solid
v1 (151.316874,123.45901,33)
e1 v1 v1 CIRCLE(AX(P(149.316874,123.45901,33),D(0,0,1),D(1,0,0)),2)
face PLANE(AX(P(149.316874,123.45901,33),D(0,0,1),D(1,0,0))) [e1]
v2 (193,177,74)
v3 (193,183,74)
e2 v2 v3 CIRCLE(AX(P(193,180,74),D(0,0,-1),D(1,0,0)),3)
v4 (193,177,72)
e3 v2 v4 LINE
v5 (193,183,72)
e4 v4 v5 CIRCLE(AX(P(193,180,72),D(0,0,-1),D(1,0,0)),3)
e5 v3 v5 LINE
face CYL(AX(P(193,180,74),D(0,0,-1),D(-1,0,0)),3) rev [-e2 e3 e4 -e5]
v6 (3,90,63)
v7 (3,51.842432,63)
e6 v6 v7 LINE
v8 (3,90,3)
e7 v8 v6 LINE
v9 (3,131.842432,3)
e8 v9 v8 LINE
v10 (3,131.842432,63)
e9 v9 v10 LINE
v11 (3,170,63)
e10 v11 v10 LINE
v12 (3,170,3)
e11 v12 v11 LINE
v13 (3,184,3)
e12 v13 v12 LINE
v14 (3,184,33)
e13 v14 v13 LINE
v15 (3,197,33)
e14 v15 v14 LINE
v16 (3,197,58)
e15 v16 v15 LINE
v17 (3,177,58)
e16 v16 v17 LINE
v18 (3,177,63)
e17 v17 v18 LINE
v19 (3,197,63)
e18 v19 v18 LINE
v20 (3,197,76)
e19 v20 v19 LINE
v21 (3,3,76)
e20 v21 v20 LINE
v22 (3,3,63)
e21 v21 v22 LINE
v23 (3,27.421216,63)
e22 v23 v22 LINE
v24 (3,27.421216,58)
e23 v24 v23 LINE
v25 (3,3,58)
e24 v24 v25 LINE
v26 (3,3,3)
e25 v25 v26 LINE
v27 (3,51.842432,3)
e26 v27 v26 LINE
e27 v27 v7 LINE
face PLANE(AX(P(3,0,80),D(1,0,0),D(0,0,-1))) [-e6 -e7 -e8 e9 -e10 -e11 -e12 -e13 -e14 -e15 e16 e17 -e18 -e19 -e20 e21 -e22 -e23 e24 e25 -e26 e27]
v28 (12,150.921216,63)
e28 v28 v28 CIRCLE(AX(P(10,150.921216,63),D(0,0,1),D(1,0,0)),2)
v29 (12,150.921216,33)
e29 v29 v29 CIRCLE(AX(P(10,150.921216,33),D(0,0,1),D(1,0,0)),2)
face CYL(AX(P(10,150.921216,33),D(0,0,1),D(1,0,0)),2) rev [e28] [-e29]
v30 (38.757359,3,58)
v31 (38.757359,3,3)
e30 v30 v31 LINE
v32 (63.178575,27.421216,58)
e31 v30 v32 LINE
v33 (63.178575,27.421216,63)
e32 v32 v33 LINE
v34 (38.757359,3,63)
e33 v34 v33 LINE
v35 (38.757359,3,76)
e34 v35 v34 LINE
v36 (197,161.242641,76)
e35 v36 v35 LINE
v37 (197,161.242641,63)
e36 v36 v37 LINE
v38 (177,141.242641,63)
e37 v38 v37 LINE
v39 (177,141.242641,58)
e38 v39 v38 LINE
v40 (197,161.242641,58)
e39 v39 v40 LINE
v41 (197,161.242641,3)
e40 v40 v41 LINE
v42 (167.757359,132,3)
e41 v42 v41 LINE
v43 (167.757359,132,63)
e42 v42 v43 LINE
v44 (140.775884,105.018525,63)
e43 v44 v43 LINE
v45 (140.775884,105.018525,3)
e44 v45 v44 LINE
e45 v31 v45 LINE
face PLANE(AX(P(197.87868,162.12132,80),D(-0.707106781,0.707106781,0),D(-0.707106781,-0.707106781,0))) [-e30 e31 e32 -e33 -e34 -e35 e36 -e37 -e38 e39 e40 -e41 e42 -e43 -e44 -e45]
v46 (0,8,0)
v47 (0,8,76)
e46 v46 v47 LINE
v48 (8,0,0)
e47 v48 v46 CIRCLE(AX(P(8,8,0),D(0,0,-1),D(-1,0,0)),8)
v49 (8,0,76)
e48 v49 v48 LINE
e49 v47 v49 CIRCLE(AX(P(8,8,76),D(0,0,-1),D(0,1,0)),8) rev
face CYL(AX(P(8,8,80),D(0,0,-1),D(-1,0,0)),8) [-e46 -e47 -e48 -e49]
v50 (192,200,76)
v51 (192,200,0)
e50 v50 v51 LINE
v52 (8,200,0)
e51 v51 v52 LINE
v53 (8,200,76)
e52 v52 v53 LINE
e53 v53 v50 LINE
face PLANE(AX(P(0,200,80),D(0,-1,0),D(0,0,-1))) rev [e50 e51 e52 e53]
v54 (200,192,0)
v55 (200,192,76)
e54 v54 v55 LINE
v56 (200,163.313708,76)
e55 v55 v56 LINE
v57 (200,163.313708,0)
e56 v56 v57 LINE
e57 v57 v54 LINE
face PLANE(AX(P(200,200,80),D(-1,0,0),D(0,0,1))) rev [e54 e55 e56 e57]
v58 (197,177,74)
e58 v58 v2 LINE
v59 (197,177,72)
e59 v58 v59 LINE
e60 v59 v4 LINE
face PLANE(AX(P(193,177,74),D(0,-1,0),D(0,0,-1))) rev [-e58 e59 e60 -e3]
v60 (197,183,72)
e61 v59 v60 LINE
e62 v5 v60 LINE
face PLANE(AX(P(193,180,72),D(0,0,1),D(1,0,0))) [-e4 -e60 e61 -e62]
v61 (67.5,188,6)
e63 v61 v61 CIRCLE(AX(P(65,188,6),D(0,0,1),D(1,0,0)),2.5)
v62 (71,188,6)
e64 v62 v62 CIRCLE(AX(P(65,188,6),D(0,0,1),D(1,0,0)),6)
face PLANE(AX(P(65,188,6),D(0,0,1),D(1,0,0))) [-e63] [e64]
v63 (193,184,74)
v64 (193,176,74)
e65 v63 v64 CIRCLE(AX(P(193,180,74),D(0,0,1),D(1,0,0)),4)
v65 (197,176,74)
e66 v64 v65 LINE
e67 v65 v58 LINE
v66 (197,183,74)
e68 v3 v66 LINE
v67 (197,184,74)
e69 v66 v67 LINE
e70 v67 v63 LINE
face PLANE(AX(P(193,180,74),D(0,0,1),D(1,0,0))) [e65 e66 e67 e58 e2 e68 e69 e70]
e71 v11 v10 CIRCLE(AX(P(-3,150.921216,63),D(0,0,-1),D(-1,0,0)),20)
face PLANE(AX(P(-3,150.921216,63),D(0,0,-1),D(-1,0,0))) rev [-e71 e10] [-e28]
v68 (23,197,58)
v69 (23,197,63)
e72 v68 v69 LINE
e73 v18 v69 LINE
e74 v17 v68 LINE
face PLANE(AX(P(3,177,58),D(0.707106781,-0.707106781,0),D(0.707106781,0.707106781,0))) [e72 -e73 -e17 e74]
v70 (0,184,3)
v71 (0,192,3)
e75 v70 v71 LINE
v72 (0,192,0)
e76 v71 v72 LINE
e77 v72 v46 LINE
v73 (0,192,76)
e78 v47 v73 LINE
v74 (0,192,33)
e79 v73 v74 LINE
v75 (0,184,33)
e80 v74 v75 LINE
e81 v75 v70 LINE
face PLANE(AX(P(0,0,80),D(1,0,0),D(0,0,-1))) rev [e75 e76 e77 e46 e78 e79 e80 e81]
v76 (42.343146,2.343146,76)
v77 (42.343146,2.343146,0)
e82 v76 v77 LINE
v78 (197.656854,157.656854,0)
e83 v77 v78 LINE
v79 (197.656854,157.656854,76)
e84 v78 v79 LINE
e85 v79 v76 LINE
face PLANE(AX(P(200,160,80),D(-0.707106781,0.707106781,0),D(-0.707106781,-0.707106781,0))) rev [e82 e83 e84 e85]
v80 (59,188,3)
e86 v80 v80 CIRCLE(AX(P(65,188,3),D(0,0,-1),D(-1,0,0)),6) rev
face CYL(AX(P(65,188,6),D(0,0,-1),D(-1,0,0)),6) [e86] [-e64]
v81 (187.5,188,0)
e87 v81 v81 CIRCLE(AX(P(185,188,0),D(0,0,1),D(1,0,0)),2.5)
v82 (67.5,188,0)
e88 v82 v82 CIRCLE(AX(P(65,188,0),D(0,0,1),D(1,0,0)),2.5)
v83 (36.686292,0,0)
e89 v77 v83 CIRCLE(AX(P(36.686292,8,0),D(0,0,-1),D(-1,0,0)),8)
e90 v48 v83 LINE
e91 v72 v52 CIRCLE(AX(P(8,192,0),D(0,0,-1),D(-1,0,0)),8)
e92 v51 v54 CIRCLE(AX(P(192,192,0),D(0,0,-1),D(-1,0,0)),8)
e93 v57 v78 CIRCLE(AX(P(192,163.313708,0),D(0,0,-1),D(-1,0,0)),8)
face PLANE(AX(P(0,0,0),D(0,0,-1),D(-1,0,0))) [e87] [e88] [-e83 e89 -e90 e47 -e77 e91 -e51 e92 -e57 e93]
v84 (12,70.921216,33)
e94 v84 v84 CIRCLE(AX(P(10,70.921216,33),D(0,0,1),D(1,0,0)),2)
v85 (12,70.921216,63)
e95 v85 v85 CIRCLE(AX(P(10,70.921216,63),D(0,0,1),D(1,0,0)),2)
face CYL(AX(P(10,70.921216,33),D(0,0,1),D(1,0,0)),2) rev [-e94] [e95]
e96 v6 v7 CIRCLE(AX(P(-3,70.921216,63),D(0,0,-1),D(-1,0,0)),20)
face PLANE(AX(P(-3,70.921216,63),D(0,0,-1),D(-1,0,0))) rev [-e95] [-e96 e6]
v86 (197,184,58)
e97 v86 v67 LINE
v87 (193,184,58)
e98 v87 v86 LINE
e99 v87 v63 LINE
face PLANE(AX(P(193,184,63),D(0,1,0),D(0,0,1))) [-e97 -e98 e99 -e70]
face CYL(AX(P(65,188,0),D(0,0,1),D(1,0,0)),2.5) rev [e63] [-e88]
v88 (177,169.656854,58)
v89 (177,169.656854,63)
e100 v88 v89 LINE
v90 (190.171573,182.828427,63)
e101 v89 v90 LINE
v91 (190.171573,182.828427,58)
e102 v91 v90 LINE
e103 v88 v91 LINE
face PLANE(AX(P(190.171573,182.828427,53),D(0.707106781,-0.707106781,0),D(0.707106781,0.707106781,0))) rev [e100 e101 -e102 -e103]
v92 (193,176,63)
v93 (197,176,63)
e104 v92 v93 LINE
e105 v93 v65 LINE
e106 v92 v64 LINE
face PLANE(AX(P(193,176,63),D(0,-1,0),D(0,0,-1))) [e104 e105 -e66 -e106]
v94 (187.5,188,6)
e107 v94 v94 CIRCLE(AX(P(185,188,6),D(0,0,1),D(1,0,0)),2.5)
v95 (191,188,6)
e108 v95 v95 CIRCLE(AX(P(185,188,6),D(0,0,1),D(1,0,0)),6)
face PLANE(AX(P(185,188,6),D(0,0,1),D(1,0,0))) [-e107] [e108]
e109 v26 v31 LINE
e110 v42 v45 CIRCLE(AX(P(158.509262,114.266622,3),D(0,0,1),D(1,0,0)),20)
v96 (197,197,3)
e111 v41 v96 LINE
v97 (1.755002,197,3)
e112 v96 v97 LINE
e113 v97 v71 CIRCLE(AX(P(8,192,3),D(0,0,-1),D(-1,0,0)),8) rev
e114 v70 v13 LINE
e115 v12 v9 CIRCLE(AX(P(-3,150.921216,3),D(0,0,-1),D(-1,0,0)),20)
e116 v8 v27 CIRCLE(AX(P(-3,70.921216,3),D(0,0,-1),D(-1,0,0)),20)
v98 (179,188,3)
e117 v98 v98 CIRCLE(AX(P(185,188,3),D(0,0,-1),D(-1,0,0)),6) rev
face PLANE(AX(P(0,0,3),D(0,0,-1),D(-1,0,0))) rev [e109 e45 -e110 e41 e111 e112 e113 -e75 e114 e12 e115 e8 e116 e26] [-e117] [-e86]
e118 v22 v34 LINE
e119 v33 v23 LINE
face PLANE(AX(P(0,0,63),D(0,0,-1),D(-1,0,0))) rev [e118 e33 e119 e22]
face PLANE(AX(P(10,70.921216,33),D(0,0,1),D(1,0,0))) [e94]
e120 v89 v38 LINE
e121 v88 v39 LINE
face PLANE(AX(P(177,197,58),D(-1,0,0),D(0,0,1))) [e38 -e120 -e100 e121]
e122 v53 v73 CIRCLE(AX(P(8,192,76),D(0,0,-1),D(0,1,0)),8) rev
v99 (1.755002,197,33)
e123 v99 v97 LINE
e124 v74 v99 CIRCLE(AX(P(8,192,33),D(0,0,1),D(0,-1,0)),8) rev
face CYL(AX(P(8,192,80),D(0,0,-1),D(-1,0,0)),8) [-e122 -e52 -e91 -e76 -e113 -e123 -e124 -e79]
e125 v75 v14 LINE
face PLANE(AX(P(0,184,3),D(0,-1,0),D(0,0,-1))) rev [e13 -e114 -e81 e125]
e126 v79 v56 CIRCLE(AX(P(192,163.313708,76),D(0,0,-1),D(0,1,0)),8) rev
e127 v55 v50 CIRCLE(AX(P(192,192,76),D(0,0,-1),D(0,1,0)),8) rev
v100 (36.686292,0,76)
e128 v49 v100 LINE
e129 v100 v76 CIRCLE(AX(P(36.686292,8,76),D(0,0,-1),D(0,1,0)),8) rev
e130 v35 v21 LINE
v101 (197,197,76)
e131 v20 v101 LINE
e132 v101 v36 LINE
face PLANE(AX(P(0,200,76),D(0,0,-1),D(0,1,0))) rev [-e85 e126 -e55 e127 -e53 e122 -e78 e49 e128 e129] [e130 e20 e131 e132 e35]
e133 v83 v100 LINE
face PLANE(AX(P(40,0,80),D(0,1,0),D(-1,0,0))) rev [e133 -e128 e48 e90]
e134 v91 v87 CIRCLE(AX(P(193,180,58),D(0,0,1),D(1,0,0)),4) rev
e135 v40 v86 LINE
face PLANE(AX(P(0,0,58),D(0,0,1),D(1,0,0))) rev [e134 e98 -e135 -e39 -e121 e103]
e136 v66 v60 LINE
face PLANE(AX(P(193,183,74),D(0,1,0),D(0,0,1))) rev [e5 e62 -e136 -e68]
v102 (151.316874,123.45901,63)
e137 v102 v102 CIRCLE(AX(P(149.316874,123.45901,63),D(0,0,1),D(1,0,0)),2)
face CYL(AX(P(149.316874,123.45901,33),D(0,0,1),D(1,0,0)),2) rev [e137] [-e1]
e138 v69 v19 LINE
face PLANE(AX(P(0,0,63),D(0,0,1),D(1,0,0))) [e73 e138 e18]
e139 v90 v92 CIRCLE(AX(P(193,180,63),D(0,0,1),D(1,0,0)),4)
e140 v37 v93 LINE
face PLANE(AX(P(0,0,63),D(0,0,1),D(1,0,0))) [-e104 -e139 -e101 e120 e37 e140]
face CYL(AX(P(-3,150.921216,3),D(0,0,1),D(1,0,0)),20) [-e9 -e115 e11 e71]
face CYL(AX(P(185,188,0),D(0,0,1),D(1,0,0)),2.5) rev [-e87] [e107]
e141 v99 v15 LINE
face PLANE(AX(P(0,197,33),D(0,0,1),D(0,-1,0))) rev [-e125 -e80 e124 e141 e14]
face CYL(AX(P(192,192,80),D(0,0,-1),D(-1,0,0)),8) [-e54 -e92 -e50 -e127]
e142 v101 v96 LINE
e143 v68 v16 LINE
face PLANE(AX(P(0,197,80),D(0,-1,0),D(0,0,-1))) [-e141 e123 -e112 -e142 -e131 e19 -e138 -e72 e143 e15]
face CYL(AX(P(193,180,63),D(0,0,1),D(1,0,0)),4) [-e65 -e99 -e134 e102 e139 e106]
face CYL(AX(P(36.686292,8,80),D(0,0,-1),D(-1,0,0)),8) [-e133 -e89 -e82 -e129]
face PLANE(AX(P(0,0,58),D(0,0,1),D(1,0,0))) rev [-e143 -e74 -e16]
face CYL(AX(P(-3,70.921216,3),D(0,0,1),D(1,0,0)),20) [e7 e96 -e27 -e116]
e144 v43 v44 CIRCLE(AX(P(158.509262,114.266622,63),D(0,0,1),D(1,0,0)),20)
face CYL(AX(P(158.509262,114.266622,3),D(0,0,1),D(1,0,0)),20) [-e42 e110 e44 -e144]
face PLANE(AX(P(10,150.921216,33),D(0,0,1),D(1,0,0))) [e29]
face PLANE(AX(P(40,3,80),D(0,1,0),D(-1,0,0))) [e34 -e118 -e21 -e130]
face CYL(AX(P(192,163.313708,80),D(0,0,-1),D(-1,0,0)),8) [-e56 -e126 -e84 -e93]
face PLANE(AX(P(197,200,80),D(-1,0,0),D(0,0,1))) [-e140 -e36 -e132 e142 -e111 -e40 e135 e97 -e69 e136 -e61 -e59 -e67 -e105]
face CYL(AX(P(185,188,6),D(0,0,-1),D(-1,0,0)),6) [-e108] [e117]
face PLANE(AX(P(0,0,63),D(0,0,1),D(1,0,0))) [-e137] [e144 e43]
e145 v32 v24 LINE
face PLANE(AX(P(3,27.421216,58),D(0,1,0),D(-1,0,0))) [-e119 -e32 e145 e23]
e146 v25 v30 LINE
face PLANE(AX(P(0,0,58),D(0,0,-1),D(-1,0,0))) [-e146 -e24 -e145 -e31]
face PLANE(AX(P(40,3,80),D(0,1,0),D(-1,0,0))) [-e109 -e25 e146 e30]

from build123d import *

# Parameters (mm, degrees)
ESTRUSIONE_ESTRUSIONE1_DEPTH  = 80
SVUOTA1_T                     = -3
TAGLIO_ESTRUSIONE1_DEPTH      = 294.938769134
TAGLIO_ESTRUSIONE1_DEPTH_BACK = 294.938769134
SCHIZZO5_W                    = 4
SCHIZZO5_H                    = 200
ESTRUSIONE_ESTRUSIONE4_DEPTH  = 60
SCHIZZO8_R                    = 2
TAGLIO_ESTRUSIONE2_DEPTH      = 30
ESTRUSIONE_ESTRUSIONE7_DEPTH  = 5
ESTRUSIONE_ESTRUSIONE8_DEPTH  = 9
ESTRUSIONE_ESTRUSIONE9_START  = 2
ESTRUSIONE_ESTRUSIONE9_DEPTH  = 2
TAGLIO_ESTRUSIONE3_START      = -3
TAGLIO_ESTRUSIONE3_OUTLINE_W  = 30
TAGLIO_ESTRUSIONE3_OUTLINE_H  = 13
TAGLIO_ESTRUSIONE3_DEPTH      = 3
TAGLIO_ESTRUSIONE5_DEPTH      = 10
SCHIZZO18_R                   = 6
ESTRUSIONE_ESTRUSIONE11_DEPTH = 3
TAGLIO_ESTRUSIONE6_DEPTH      = 292.376045687
TAGLIO_ESTRUSIONE6_DEPTH_BACK = 292.376045687
SCHIZZO19_R                   = 2.5
RACCORDO1_R                   = 8


# Read off the part's stored shape, not the designer's step: Taglio-Estrusione3
with BuildPart() as part:
    # Schizzo2 → Estrusione-Estrusione1 (new body)
    with BuildSketch(Plane.XY):
        Polygon((0, 0), (0, 200), (200, 200), (200, 160), (40, 0), align=None)
    extrude(amount=ESTRUSIONE_ESTRUSIONE1_DEPTH)

    # Svuota1
    svuota1_openings = [part.faces().sort_by_distance(p)[0] for p in [
        (78.039215686, 121.960784314, 80),
    ]]
    offset(amount=SVUOTA1_T, openings=svuota1_openings, kind=Kind.INTERSECTION)

    # Schizzo5 → Taglio-Estrusione1 (cut, two sides: drawn at the far end of the back side and taken through both)
    with BuildSketch(Plane(origin=(200, 0, 0), x_dir=(0, 0, -1), z_dir=(1, 0, 0)).offset(-TAGLIO_ESTRUSIONE1_DEPTH_BACK)):
        with Locations((-78, 100)):
            Rectangle(SCHIZZO5_W, SCHIZZO5_H)
    extrude(amount=TAGLIO_ESTRUSIONE1_DEPTH + TAGLIO_ESTRUSIONE1_DEPTH_BACK, mode=Mode.SUBTRACT)

    # Schizzo7 → Estrusione-Estrusione4 (add)
    with BuildSketch(Plane.XY.offset(63)):
        with BuildLine():
            Line((140.775884186, 105.018524874), (167.757359313, 132))
            ThreePointArc((167.757359313, 132), (144.367126813, 128.408757373), (140.775884186, 105.018524874))
        make_face()
        with BuildLine():
            ThreePointArc((3, 170), (17, 150.921215972), (3, 131.842431943))
            Line((3, 131.842431943), (3, 170))
        make_face()
        with BuildLine():
            ThreePointArc((3, 90), (17, 70.921215972), (3, 51.842431943))
            Line((3, 51.842431943), (3, 90))
        make_face()
    extrude(amount=-ESTRUSIONE_ESTRUSIONE4_DEPTH)

    # Schizzo8 → Taglio-Estrusione2 (cut)
    with BuildSketch(Plane.XY.offset(63)):
        with Locations((10, 150.921215972)):
            Circle(SCHIZZO8_R)
        with Locations((10, 70.921215972)):
            Circle(SCHIZZO8_R)
        with Locations((149.316874281, 123.459009905)):
            Circle(SCHIZZO8_R)
    extrude(amount=-TAGLIO_ESTRUSIONE2_DEPTH, mode=Mode.SUBTRACT)

    # Schizzo11 → Estrusione-Estrusione7 (add)
    with BuildSketch(Plane.XY.offset(63)):
        Polygon((3, 197), (3, 177), (23, 197), align=None)
        Polygon((197, 161.242640687), (197, 197), (177, 197), (177, 141.242640687), align=None)
        Polygon((3, 3), (3, 27.421215972), (63.178575285, 27.421215972), (38.757359313, 3), align=None)
    extrude(amount=-ESTRUSIONE_ESTRUSIONE7_DEPTH)

    # Schizzo12 → Estrusione-Estrusione8 (add)
    with BuildSketch(Plane.XY.offset(72)):
        with BuildLine():
            Line((193, 184), (197, 184))
            Line((197, 184), (197, 176))
            Line((197, 176), (193, 176))
            ThreePointArc((193, 176), (189, 180), (193, 184))
        make_face()
    extrude(amount=-ESTRUSIONE_ESTRUSIONE8_DEPTH)

    # Schizzo13 → Estrusione-Estrusione9 (add)
    with BuildSketch(Plane.XY.offset(72).offset(ESTRUSIONE_ESTRUSIONE9_START)):
        with BuildLine():
            Line((193, 177), (196, 177))
            Line((196, 177), (197, 177))
            Line((197, 177), (197, 176))
            Line((197, 176), (193, 176))
            ThreePointArc((193, 176), (189, 180), (193, 184))
            Line((193, 184), (197, 184))
            Line((197, 184), (197, 183))
            Line((197, 183), (193, 183))
            ThreePointArc((193, 183), (190, 180), (193, 177))
        make_face()
    extrude(amount=-ESTRUSIONE_ESTRUSIONE9_DEPTH)

    # Taglio-Estrusione3 outline → Taglio-Estrusione3 (cut)
    with BuildSketch(Plane(origin=(3, 0, 0), x_dir=(0, 0, -1), z_dir=(1, 0, 0)).offset(TAGLIO_ESTRUSIONE3_START)):
        with Locations((-18, 190.5)):
            Rectangle(TAGLIO_ESTRUSIONE3_OUTLINE_W, TAGLIO_ESTRUSIONE3_OUTLINE_H)
    extrude(amount=TAGLIO_ESTRUSIONE3_DEPTH, mode=Mode.SUBTRACT)

    # Schizzo16 → Taglio-Estrusione5 (cut)
    with BuildSketch(Plane.XY.offset(63)):
        with BuildLine():
            Line((190.171572875, 182.828427125), (177, 169.656854249))
            Line((177, 169.656854249), (177, 197))
            Line((177, 197), (197, 197))
            Line((197, 197), (197, 184))
            Line((197, 184), (193, 184))
            ThreePointArc((193, 184), (191.469266271, 183.69551813), (190.171572875, 182.828427125))
        make_face()
    extrude(amount=-TAGLIO_ESTRUSIONE5_DEPTH, mode=Mode.SUBTRACT)

    # Schizzo18 → Estrusione-Estrusione11 (add)
    with BuildSketch(Plane.XY.offset(3)):
        with Locations(Location((65, 188, 0), (0, 0, 180))):
            Circle(SCHIZZO18_R)
        with Locations(Location((185, 188, 0), (0, 0, 180))):
            Circle(SCHIZZO18_R)
    extrude(amount=ESTRUSIONE_ESTRUSIONE11_DEPTH)

    # Schizzo19 → Taglio-Estrusione6 (cut, two sides: drawn at the far end of the back side and taken through both)
    with BuildSketch(Plane.XY.offset(6).offset(-TAGLIO_ESTRUSIONE6_DEPTH_BACK)):
        with Locations((65, 188)):
            Circle(SCHIZZO19_R)
        with Locations((185, 188)):
            Circle(SCHIZZO19_R)
    extrude(amount=TAGLIO_ESTRUSIONE6_DEPTH + TAGLIO_ESTRUSIONE6_DEPTH_BACK, mode=Mode.SUBTRACT)

    # Raccordo1
    # the kernel refuses this fillet: 8 mm, written as the material it takes off along each edge
    with BuildSketch(Plane(origin=(40, 0, -8.284271247), x_dir=(-1, 0, 0), z_dir=(0, 0, 1)), Plane(origin=(200, 160, -8.284271247), x_dir=(-0.7071067811865432, -0.7071067811865518, 0), z_dir=(0, 0, 1))) as raccordo1_piece_1:
        with BuildLine():
            CenterArc((RACCORDO1_R * 0.414213562373, -RACCORDO1_R), RACCORDO1_R, 90, 45)
            Line((-RACCORDO1_R * 0.292893218813, -RACCORDO1_R * 0.292893218813), (0, 0))
            Line((0, 0), (RACCORDO1_R * 0.414213562373, 0))
        make_face()
    extrude(amount=92.568542495, mode=Mode.SUBTRACT)
    with BuildSketch(Plane(origin=(0, 0, -20), x_dir=(0, 1, 0), z_dir=(0, 0, 1))) as raccordo1_piece_2:
        with BuildLine():
            CenterArc((RACCORDO1_R, -RACCORDO1_R), RACCORDO1_R, 90, 90)
            Line((0, -RACCORDO1_R), (0, 0))
            Line((0, 0), (RACCORDO1_R, 0))
        make_face()
    extrude(amount=116, mode=Mode.SUBTRACT)
    with BuildSketch(Plane(origin=(0, 200, -20), x_dir=(0, -1, 0), z_dir=(0, 0, 1)), Plane(origin=(200, 200, -20), x_dir=(-1, 0, 0), z_dir=(0, 0, 1))) as raccordo1_piece_3:
        with BuildLine():
            CenterArc((RACCORDO1_R, RACCORDO1_R), RACCORDO1_R, 180, 90)
            Line((0, RACCORDO1_R), (0, 0))
            Line((0, 0), (RACCORDO1_R, 0))
        make_face()
    extrude(amount=116, mode=Mode.SUBTRACT)


solid = part.part
